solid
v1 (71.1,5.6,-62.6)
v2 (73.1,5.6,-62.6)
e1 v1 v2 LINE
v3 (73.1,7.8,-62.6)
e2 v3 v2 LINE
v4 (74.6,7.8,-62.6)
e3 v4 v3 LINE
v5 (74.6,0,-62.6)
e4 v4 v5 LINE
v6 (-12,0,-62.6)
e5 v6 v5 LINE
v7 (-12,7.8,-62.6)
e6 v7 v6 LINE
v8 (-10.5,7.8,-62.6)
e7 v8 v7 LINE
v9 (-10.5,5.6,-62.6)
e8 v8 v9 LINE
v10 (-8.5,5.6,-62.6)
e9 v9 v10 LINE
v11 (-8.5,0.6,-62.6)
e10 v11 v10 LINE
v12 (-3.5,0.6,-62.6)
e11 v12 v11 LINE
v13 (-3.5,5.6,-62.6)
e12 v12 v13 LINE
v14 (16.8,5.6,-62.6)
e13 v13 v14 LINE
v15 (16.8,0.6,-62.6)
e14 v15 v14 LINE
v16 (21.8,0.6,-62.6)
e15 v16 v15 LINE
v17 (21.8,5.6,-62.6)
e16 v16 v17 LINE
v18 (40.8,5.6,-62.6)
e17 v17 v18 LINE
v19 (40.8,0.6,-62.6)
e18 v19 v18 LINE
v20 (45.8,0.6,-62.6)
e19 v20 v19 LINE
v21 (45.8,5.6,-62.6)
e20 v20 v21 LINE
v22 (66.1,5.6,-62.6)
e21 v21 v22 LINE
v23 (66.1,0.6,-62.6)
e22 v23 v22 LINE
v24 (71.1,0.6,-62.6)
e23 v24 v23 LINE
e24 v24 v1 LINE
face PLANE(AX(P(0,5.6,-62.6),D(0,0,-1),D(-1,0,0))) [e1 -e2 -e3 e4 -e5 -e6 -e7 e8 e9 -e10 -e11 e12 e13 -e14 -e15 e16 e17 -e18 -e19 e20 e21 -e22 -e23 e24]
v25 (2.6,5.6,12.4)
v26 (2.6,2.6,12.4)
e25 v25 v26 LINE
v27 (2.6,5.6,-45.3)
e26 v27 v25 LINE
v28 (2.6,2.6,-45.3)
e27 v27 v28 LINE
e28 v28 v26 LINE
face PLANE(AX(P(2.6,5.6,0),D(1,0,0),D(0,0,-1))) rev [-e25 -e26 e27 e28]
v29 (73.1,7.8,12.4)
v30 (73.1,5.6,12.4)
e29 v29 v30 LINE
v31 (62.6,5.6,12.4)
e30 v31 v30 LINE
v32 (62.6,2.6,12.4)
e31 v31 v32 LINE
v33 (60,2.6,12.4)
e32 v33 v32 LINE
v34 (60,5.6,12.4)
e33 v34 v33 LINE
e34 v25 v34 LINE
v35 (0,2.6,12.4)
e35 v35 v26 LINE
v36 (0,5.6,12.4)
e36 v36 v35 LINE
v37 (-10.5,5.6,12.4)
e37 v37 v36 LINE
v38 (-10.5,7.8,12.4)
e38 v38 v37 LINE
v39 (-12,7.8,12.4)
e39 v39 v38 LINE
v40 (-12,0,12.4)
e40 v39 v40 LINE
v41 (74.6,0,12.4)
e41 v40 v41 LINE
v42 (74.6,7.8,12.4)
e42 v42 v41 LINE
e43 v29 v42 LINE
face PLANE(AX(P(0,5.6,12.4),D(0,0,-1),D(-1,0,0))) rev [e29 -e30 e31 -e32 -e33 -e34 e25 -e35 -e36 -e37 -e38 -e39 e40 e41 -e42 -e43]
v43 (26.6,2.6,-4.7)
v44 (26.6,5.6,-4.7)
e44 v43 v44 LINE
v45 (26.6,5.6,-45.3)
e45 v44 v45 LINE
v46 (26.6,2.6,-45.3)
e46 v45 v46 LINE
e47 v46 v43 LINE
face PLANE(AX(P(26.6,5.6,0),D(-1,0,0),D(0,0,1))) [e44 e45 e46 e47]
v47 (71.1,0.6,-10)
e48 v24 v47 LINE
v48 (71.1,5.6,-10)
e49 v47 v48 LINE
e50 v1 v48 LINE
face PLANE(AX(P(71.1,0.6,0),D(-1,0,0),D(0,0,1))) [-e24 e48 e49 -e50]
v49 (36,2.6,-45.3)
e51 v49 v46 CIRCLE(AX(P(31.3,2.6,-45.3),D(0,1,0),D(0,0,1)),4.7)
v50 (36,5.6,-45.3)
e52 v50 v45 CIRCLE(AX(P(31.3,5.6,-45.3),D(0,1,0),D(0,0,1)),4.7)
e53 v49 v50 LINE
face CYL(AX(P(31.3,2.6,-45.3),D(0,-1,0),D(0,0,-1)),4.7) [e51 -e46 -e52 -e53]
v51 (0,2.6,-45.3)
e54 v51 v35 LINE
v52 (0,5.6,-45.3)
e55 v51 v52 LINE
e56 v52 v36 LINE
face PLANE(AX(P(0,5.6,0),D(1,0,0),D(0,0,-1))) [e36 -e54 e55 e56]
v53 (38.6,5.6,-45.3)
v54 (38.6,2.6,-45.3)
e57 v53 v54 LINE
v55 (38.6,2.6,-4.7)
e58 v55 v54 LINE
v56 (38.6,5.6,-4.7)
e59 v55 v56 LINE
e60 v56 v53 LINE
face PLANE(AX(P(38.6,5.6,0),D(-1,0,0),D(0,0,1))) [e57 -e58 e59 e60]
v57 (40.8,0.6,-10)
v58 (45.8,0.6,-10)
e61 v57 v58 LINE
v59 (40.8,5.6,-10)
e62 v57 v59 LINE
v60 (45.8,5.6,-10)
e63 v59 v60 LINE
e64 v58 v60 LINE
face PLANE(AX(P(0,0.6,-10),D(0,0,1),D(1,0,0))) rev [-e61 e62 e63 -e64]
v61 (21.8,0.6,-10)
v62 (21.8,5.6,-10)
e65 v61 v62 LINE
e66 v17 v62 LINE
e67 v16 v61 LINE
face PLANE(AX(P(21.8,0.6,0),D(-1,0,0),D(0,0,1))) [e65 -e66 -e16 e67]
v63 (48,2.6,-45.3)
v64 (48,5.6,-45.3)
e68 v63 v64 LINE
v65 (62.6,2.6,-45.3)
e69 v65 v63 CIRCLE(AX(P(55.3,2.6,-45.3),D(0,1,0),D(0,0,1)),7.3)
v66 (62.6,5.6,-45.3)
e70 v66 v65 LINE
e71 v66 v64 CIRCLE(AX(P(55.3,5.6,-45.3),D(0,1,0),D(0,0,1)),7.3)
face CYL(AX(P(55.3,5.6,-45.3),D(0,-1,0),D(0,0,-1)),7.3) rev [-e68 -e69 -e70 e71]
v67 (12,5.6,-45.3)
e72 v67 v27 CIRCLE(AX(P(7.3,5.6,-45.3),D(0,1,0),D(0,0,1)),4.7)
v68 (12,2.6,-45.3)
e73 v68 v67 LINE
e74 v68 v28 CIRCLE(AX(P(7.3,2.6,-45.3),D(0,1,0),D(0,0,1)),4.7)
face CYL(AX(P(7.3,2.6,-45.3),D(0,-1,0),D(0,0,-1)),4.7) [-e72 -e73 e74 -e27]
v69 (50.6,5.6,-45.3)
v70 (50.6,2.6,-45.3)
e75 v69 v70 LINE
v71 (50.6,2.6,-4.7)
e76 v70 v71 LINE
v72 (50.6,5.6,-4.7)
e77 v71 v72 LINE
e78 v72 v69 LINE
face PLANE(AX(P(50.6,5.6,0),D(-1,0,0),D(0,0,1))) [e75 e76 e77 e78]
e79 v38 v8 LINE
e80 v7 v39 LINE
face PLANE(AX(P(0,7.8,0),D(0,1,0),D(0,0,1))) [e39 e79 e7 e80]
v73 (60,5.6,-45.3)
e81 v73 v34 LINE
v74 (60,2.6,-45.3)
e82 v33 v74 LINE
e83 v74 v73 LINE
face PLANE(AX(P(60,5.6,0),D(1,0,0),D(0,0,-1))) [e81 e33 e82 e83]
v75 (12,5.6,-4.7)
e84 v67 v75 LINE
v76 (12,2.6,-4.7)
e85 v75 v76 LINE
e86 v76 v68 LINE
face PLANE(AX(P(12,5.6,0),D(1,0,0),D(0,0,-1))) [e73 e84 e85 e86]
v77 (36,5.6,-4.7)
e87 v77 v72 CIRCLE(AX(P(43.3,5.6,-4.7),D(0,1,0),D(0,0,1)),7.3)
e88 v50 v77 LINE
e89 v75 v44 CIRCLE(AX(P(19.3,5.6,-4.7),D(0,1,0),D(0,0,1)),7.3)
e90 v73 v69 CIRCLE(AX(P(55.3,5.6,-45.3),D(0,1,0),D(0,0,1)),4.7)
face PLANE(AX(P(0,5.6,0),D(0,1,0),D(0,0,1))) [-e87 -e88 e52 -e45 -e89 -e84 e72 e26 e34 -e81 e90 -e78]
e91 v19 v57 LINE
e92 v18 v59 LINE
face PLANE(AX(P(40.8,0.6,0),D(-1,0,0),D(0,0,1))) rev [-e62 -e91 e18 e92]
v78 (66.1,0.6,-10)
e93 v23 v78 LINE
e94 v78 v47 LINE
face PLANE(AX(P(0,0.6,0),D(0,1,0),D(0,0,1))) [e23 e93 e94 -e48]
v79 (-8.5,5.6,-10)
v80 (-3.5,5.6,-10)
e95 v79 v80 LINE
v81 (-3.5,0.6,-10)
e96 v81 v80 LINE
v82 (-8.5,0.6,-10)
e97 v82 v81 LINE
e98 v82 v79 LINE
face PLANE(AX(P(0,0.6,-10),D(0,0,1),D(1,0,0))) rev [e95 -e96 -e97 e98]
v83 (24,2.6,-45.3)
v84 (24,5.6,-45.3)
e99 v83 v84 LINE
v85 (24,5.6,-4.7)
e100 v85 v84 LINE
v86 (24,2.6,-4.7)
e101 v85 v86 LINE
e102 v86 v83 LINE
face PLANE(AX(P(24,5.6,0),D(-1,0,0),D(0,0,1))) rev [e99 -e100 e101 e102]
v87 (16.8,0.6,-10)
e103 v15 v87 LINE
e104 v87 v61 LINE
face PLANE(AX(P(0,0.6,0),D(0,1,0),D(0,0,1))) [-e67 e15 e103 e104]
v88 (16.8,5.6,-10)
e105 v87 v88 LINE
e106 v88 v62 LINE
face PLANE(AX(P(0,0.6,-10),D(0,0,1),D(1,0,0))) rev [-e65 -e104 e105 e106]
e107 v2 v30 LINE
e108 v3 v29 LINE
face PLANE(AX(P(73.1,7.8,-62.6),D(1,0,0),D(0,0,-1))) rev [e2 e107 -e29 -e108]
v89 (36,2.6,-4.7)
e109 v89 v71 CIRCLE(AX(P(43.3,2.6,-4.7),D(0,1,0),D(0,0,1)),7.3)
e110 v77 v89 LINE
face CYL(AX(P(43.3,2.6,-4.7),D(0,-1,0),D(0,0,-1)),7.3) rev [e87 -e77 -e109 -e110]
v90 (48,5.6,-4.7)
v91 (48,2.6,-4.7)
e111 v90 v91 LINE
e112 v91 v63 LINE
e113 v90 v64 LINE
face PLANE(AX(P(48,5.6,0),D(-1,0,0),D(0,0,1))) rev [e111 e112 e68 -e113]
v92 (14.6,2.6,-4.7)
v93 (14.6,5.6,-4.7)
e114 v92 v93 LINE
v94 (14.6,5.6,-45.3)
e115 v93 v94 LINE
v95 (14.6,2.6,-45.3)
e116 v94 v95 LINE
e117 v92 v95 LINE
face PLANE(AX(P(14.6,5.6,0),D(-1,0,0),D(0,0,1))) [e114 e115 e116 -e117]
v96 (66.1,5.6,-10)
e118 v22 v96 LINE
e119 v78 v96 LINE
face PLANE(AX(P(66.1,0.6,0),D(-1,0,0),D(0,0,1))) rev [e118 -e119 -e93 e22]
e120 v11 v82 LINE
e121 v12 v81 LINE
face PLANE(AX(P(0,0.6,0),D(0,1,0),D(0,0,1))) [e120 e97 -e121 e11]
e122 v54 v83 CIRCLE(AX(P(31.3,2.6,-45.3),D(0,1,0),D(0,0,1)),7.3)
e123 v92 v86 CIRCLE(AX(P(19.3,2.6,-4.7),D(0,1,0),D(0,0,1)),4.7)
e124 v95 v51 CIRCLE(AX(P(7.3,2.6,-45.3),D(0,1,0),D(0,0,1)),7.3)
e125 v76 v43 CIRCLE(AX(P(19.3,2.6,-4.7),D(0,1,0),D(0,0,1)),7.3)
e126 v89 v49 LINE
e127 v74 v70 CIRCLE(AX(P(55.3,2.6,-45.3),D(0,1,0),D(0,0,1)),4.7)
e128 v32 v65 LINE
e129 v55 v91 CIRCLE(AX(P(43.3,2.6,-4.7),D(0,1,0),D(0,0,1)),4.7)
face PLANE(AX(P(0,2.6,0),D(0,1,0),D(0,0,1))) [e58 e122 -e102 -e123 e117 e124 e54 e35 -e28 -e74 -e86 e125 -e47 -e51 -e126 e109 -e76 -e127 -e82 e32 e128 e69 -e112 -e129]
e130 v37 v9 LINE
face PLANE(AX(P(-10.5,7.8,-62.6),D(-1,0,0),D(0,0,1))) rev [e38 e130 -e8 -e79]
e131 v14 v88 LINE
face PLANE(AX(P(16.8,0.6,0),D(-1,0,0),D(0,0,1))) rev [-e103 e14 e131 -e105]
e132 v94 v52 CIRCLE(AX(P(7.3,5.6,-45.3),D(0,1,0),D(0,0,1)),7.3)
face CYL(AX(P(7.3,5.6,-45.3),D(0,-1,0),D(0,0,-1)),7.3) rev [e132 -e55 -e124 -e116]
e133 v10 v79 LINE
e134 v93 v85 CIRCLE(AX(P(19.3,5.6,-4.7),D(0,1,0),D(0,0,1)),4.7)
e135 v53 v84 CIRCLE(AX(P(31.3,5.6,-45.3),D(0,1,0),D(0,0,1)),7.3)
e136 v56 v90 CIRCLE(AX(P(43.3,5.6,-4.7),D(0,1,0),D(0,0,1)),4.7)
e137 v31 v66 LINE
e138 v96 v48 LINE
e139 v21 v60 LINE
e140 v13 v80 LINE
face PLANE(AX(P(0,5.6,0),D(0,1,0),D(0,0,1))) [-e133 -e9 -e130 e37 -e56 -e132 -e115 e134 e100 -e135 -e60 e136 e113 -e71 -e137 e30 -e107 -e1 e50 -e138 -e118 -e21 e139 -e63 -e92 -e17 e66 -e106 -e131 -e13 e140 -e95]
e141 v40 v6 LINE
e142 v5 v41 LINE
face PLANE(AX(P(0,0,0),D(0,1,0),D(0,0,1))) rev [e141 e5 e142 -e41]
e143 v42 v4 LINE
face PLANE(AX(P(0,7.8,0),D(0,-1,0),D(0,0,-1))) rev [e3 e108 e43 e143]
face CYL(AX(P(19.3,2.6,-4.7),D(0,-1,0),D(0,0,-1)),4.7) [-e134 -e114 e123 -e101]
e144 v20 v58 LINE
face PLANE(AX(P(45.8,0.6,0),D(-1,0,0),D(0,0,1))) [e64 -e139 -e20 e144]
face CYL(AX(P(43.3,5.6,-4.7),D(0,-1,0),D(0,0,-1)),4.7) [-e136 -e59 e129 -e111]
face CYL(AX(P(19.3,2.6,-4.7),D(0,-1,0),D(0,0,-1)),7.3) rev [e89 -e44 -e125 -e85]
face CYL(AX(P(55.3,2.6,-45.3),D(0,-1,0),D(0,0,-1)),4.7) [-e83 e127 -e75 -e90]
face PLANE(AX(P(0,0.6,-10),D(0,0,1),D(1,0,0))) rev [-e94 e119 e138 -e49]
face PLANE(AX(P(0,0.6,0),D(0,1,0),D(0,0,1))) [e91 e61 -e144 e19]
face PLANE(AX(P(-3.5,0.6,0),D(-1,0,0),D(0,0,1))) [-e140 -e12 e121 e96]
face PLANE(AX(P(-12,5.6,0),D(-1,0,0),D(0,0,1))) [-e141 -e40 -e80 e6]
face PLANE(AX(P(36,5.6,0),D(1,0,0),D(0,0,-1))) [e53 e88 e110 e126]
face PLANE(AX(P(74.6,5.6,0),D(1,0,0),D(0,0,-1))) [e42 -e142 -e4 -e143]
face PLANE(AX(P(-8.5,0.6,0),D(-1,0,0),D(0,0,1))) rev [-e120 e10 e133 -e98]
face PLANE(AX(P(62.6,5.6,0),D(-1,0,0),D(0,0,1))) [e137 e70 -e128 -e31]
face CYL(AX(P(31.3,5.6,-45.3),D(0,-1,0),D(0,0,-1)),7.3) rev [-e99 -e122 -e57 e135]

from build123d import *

# Parameters (mm, degrees)
EXTRUDE_4_DEPTH     = 5.6
EXTRUDE_4_2_DEPTH   = 5.6
SKETCH_9_W          = 2.6
SKETCH_9_H          = 12.4
SKETCH_9_H_2        = 50
EXTRUDE_6_DEPTH     = 2.6
DS18B20_W           = 5
DS18B20_H           = 42.5
DS18B20_H_2         = 10.1
CUT_EXTRUDE_1_DEPTH = 5
SKETCH_7_W          = 1.5
SKETCH_7_H          = 75
EXTRUDE_8_DEPTH     = 2.2
FILLET_1_RADIUS     = 4.7
FILLET_1_LENGTH     = 3
FILLET_2_R          = 7.3
FILLET_3_RADIUS     = 4.7
FILLET_3_LENGTH     = 3
FILLET_4_R          = 7.3
FILLET_5_RADIUS     = 4.7
FILLET_5_LENGTH     = 3
FILLET_6_R          = 7.3
FILLET_7_R          = 7.3
FILLET_8_RADIUS     = 4.7
FILLET_8_LENGTH     = 3
FILLET_9_RADIUS     = 4.7
FILLET_9_LENGTH     = 3
FILLET_10_R         = 7.3


with BuildPart() as part:
    # Sketch 2111 → Бобышка-Вытянуть4 (new body)
    with BuildSketch(Plane(origin=(0, 0, 0), x_dir=(1, 0, 0), z_dir=(0, 1, 0))):
        Polygon((14.6, 50), (14.6, 0), (24, 0), (24, 50), (24, 52.6), (38.6, 52.6), (38.6, 50), (38.6, 0), (48, 0), (48, 50), (48, 52.6), (62.6, 52.6), (62.6, 50), (62.6, 0), (62.6, -12.4), (74.6, -12.4), (74.6, 62.6), (-12, 62.6), (-12, -12.4), (0, -12.4), (0, 0), (0, 50), (0, 52.6), (14.6, 52.6), align=None)
    extrude(amount=EXTRUDE_4_DEPTH)



with BuildPart() as body_2:
    # Sketch 2111 → Extrude 4 2 (new body)
    with BuildSketch(Plane(origin=(0, 0, 0), x_dir=(1, 0, 0), z_dir=(0, 1, 0))):
        Polygon((12, -2.6), (12, 0), (12, 50), (2.6, 50), (2.6, 0), (2.6, -12.4), (60, -12.4), (60, 0), (60, 50), (50.6, 50), (50.6, 0), (50.6, -2.6), (36, -2.6), (36, 0), (36, 50), (26.6, 50), (26.6, 0), (26.6, -2.6), align=None)
    extrude(amount=EXTRUDE_4_2_DEPTH)


with BuildPart() as part_1:
    add(part.part)

    add(body_2.part)  # Бобышка-Вытянуть6 merges body 2
    # Подложка трубки<9> → Бобышка-Вытянуть6 (add)
    with BuildSketch(Plane(origin=(0, 0, 0), x_dir=(1, 0, 0), z_dir=(0, 1, 0))):
        with Locations((1.3, -6.2)):
            Rectangle(SKETCH_9_W, SKETCH_9_H)
        with Locations((1.3, 25)):
            Rectangle(SKETCH_9_W, SKETCH_9_H_2)
        Polygon((14.6, 0), (12, 0), (12, -2.6), (26.6, -2.6), (26.6, 0), (24, 0), align=None)
        with Locations((13.3, 25)):
            Rectangle(SKETCH_9_W, SKETCH_9_H_2)
        with Locations((25.3, 25)):
            Rectangle(SKETCH_9_W, SKETCH_9_H_2)
        Polygon((2.6, 50), (12, 50), (14.6, 50), (14.6, 52.6), (0, 52.6), (0, 50), align=None)
        Polygon((24, 52.6), (24, 50), (26.6, 50), (36, 50), (38.6, 50), (38.6, 52.6), align=None)
        with Locations((37.3, 25)):
            Rectangle(SKETCH_9_W, SKETCH_9_H_2)
        Polygon((38.6, 0), (36, 0), (36, -2.6), (50.6, -2.6), (50.6, 0), (48, 0), align=None)
        with Locations((49.3, 25)):
            Rectangle(SKETCH_9_W, SKETCH_9_H_2)
        Polygon((50.6, 50), (60, 50), (62.6, 50), (62.6, 52.6), (48, 52.6), (48, 50), align=None)
        with Locations((61.3, 25)):
            Rectangle(SKETCH_9_W, SKETCH_9_H_2)
        with Locations((61.3, -6.2)):
            Rectangle(SKETCH_9_W, SKETCH_9_H)
    extrude(amount=EXTRUDE_6_DEPTH)

    # DS18B20 → Вырез-Вытянуть1 (cut)
    with BuildSketch(Plane(origin=(0, 5.6, 0), x_dir=(1, 0, 0), z_dir=(0, 1, 0))):
        Polygon((-8.5, 62.6), (-8.5, 17.457748372), (-3.5, 19.012014035), (-3.5, 62.6), align=None)
        Polygon((-3.5, 19.012014035), (-8.5, 17.457748372), (-8.5, 10), (-3.5, 10), align=None)
        with Locations((19.3, 41.35)):
            Rectangle(DS18B20_W, DS18B20_H)
        with Locations((19.3, 15.05)):
            Rectangle(DS18B20_W, DS18B20_H_2)
        with Locations((43.3, 41.35)):
            Rectangle(DS18B20_W, DS18B20_H)
        with Locations((43.3, 15.05)):
            Rectangle(DS18B20_W, DS18B20_H_2)
        with Locations((68.6, 41.35)):
            Rectangle(DS18B20_W, DS18B20_H)
        with Locations((68.6, 15.05)):
            Rectangle(DS18B20_W, DS18B20_H_2)
    extrude(amount=-CUT_EXTRUDE_1_DEPTH, mode=Mode.SUBTRACT)

    # Эскиз7 → Бобышка-Вытянуть8 (add)
    with BuildSketch(Plane(origin=(0, 5.6, 0), x_dir=(1, 0, 0), z_dir=(0, 1, 0))):
        with Locations((-11.25, 25.1)):
            Rectangle(SKETCH_7_W, SKETCH_7_H)
        with Locations((73.85, 25.1)):
            Rectangle(SKETCH_7_W, SKETCH_7_H)
    extrude(amount=EXTRUDE_8_DEPTH)

    # Скругление1: full round fillet: the end face becomes a half cylinder, R = half its width
    fillet_1_face = Plane((55.3, 4.1, -50), x_dir=(0, -1, 0), z_dir=(0, 0, -1))  # on the end face: x along it, z out of the body
    fillet_1_slab = fillet_1_face.offset(-FILLET_1_RADIUS / 2) * Box(FILLET_1_LENGTH, 2 * FILLET_1_RADIUS, FILLET_1_RADIUS, mode=Mode.PRIVATE)  # the body's end, R deep
    fillet_1_round = Plane((55.3, 4.1, -45.3), x_dir=(0, 0, -1), z_dir=(0, -1, 0)) * Cylinder(FILLET_1_RADIUS, FILLET_1_LENGTH, mode=Mode.PRIVATE)  # its axis R under the face
    add(fillet_1_slab - fillet_1_round, mode=Mode.SUBTRACT)

    # Скругление2
    fillet_2_edges = [part_1.edges().sort_by_distance(p)[0] for p in [
        (62.6, 4.1, -52.6),
        (48, 4.1, -52.6),
    ]]
    fillet(fillet_2_edges, radius=FILLET_2_R - 0.0001)  # a hair under: the kernel refuses the full size

    # Скругление3: full round fillet: the end face becomes a half cylinder, R = half its width
    fillet_3_face = Plane((43.3, 4.1, 0), x_dir=(0, 1, 0), z_dir=(0, 0, 1))  # on the end face: x along it, z out of the body
    fillet_3_slab = fillet_3_face.offset(-FILLET_3_RADIUS / 2) * Box(FILLET_3_LENGTH, 2 * FILLET_3_RADIUS, FILLET_3_RADIUS, mode=Mode.PRIVATE)  # the body's end, R deep
    fillet_3_round = Plane((43.3, 4.1, -4.7), x_dir=(0, 0, 1), z_dir=(0, 1, 0)) * Cylinder(FILLET_3_RADIUS, FILLET_3_LENGTH, mode=Mode.PRIVATE)  # its axis R under the face
    add(fillet_3_slab - fillet_3_round, mode=Mode.SUBTRACT)

    # Скругление4
    fillet_4_edges = [part_1.edges().sort_by_distance(p)[0] for p in [
        (50.6, 4.1, 2.6),
        (36, 4.1, 2.6),
    ]]
    fillet(fillet_4_edges, radius=FILLET_4_R - 0.0001)  # a hair under: the kernel refuses the full size

    # Скругление5: full round fillet: the end face becomes a half cylinder, R = half its width
    fillet_5_face = Plane((31.3, 4.1, -50), x_dir=(0, -1, 0), z_dir=(0, 0, -1))  # on the end face: x along it, z out of the body
    fillet_5_slab = fillet_5_face.offset(-FILLET_5_RADIUS / 2) * Box(FILLET_5_LENGTH, 2 * FILLET_5_RADIUS, FILLET_5_RADIUS, mode=Mode.PRIVATE)  # the body's end, R deep
    fillet_5_round = Plane((31.3, 4.1, -45.3), x_dir=(0, 0, -1), z_dir=(0, -1, 0)) * Cylinder(FILLET_5_RADIUS, FILLET_5_LENGTH, mode=Mode.PRIVATE)  # its axis R under the face
    add(fillet_5_slab - fillet_5_round, mode=Mode.SUBTRACT)

    # Скругление6
    fillet_6_edges = [part_1.edges().sort_by_distance(p)[0] for p in [
        (38.6, 4.1, -52.6),
        (24, 4.1, -52.6),
    ]]
    fillet(fillet_6_edges, radius=FILLET_6_R - 0.0001)  # a hair under: the kernel refuses the full size

    # Скругление7
    fillet_7_edges = [part_1.edges().sort_by_distance(p)[0] for p in [
        (26.6, 4.1, 2.6),
        (12, 4.1, 2.6),
    ]]
    fillet(fillet_7_edges, radius=FILLET_7_R - 0.0001)  # a hair under: the kernel refuses the full size

    # Скругление8: full round fillet: the end face becomes a half cylinder, R = half its width
    fillet_8_face = Plane((19.3, 4.1, 0), x_dir=(0, 1, 0), z_dir=(0, 0, 1))  # on the end face: x along it, z out of the body
    fillet_8_slab = fillet_8_face.offset(-FILLET_8_RADIUS / 2) * Box(FILLET_8_LENGTH, 2 * FILLET_8_RADIUS, FILLET_8_RADIUS, mode=Mode.PRIVATE)  # the body's end, R deep
    fillet_8_round = Plane((19.3, 4.1, -4.7), x_dir=(0, 0, 1), z_dir=(0, 1, 0)) * Cylinder(FILLET_8_RADIUS, FILLET_8_LENGTH, mode=Mode.PRIVATE)  # its axis R under the face
    add(fillet_8_slab - fillet_8_round, mode=Mode.SUBTRACT)

    # Скругление9: full round fillet: the end face becomes a half cylinder, R = half its width
    fillet_9_face = Plane((7.3, 4.1, -50), x_dir=(0, 1, 0), z_dir=(0, 0, -1))  # on the end face: x along it, z out of the body
    fillet_9_slab = fillet_9_face.offset(-FILLET_9_RADIUS / 2) * Box(FILLET_9_LENGTH, 2 * FILLET_9_RADIUS, FILLET_9_RADIUS, mode=Mode.PRIVATE)  # the body's end, R deep
    fillet_9_round = Plane((7.3, 4.1, -45.3), x_dir=(0, 0, -1), z_dir=(0, 1, 0)) * Cylinder(FILLET_9_RADIUS, FILLET_9_LENGTH, mode=Mode.PRIVATE)  # its axis R under the face
    add(fillet_9_slab - fillet_9_round, mode=Mode.SUBTRACT)

    # Скругление10
    fillet_10_edges = [part_1.edges().sort_by_distance(p)[0] for p in [
        (14.6, 4.1, -52.6),
        (0, 4.1, -52.6),
    ]]
    fillet(fillet_10_edges, radius=FILLET_10_R - 0.0001)  # a hair under: the kernel refuses the full size


solid = part_1.part
